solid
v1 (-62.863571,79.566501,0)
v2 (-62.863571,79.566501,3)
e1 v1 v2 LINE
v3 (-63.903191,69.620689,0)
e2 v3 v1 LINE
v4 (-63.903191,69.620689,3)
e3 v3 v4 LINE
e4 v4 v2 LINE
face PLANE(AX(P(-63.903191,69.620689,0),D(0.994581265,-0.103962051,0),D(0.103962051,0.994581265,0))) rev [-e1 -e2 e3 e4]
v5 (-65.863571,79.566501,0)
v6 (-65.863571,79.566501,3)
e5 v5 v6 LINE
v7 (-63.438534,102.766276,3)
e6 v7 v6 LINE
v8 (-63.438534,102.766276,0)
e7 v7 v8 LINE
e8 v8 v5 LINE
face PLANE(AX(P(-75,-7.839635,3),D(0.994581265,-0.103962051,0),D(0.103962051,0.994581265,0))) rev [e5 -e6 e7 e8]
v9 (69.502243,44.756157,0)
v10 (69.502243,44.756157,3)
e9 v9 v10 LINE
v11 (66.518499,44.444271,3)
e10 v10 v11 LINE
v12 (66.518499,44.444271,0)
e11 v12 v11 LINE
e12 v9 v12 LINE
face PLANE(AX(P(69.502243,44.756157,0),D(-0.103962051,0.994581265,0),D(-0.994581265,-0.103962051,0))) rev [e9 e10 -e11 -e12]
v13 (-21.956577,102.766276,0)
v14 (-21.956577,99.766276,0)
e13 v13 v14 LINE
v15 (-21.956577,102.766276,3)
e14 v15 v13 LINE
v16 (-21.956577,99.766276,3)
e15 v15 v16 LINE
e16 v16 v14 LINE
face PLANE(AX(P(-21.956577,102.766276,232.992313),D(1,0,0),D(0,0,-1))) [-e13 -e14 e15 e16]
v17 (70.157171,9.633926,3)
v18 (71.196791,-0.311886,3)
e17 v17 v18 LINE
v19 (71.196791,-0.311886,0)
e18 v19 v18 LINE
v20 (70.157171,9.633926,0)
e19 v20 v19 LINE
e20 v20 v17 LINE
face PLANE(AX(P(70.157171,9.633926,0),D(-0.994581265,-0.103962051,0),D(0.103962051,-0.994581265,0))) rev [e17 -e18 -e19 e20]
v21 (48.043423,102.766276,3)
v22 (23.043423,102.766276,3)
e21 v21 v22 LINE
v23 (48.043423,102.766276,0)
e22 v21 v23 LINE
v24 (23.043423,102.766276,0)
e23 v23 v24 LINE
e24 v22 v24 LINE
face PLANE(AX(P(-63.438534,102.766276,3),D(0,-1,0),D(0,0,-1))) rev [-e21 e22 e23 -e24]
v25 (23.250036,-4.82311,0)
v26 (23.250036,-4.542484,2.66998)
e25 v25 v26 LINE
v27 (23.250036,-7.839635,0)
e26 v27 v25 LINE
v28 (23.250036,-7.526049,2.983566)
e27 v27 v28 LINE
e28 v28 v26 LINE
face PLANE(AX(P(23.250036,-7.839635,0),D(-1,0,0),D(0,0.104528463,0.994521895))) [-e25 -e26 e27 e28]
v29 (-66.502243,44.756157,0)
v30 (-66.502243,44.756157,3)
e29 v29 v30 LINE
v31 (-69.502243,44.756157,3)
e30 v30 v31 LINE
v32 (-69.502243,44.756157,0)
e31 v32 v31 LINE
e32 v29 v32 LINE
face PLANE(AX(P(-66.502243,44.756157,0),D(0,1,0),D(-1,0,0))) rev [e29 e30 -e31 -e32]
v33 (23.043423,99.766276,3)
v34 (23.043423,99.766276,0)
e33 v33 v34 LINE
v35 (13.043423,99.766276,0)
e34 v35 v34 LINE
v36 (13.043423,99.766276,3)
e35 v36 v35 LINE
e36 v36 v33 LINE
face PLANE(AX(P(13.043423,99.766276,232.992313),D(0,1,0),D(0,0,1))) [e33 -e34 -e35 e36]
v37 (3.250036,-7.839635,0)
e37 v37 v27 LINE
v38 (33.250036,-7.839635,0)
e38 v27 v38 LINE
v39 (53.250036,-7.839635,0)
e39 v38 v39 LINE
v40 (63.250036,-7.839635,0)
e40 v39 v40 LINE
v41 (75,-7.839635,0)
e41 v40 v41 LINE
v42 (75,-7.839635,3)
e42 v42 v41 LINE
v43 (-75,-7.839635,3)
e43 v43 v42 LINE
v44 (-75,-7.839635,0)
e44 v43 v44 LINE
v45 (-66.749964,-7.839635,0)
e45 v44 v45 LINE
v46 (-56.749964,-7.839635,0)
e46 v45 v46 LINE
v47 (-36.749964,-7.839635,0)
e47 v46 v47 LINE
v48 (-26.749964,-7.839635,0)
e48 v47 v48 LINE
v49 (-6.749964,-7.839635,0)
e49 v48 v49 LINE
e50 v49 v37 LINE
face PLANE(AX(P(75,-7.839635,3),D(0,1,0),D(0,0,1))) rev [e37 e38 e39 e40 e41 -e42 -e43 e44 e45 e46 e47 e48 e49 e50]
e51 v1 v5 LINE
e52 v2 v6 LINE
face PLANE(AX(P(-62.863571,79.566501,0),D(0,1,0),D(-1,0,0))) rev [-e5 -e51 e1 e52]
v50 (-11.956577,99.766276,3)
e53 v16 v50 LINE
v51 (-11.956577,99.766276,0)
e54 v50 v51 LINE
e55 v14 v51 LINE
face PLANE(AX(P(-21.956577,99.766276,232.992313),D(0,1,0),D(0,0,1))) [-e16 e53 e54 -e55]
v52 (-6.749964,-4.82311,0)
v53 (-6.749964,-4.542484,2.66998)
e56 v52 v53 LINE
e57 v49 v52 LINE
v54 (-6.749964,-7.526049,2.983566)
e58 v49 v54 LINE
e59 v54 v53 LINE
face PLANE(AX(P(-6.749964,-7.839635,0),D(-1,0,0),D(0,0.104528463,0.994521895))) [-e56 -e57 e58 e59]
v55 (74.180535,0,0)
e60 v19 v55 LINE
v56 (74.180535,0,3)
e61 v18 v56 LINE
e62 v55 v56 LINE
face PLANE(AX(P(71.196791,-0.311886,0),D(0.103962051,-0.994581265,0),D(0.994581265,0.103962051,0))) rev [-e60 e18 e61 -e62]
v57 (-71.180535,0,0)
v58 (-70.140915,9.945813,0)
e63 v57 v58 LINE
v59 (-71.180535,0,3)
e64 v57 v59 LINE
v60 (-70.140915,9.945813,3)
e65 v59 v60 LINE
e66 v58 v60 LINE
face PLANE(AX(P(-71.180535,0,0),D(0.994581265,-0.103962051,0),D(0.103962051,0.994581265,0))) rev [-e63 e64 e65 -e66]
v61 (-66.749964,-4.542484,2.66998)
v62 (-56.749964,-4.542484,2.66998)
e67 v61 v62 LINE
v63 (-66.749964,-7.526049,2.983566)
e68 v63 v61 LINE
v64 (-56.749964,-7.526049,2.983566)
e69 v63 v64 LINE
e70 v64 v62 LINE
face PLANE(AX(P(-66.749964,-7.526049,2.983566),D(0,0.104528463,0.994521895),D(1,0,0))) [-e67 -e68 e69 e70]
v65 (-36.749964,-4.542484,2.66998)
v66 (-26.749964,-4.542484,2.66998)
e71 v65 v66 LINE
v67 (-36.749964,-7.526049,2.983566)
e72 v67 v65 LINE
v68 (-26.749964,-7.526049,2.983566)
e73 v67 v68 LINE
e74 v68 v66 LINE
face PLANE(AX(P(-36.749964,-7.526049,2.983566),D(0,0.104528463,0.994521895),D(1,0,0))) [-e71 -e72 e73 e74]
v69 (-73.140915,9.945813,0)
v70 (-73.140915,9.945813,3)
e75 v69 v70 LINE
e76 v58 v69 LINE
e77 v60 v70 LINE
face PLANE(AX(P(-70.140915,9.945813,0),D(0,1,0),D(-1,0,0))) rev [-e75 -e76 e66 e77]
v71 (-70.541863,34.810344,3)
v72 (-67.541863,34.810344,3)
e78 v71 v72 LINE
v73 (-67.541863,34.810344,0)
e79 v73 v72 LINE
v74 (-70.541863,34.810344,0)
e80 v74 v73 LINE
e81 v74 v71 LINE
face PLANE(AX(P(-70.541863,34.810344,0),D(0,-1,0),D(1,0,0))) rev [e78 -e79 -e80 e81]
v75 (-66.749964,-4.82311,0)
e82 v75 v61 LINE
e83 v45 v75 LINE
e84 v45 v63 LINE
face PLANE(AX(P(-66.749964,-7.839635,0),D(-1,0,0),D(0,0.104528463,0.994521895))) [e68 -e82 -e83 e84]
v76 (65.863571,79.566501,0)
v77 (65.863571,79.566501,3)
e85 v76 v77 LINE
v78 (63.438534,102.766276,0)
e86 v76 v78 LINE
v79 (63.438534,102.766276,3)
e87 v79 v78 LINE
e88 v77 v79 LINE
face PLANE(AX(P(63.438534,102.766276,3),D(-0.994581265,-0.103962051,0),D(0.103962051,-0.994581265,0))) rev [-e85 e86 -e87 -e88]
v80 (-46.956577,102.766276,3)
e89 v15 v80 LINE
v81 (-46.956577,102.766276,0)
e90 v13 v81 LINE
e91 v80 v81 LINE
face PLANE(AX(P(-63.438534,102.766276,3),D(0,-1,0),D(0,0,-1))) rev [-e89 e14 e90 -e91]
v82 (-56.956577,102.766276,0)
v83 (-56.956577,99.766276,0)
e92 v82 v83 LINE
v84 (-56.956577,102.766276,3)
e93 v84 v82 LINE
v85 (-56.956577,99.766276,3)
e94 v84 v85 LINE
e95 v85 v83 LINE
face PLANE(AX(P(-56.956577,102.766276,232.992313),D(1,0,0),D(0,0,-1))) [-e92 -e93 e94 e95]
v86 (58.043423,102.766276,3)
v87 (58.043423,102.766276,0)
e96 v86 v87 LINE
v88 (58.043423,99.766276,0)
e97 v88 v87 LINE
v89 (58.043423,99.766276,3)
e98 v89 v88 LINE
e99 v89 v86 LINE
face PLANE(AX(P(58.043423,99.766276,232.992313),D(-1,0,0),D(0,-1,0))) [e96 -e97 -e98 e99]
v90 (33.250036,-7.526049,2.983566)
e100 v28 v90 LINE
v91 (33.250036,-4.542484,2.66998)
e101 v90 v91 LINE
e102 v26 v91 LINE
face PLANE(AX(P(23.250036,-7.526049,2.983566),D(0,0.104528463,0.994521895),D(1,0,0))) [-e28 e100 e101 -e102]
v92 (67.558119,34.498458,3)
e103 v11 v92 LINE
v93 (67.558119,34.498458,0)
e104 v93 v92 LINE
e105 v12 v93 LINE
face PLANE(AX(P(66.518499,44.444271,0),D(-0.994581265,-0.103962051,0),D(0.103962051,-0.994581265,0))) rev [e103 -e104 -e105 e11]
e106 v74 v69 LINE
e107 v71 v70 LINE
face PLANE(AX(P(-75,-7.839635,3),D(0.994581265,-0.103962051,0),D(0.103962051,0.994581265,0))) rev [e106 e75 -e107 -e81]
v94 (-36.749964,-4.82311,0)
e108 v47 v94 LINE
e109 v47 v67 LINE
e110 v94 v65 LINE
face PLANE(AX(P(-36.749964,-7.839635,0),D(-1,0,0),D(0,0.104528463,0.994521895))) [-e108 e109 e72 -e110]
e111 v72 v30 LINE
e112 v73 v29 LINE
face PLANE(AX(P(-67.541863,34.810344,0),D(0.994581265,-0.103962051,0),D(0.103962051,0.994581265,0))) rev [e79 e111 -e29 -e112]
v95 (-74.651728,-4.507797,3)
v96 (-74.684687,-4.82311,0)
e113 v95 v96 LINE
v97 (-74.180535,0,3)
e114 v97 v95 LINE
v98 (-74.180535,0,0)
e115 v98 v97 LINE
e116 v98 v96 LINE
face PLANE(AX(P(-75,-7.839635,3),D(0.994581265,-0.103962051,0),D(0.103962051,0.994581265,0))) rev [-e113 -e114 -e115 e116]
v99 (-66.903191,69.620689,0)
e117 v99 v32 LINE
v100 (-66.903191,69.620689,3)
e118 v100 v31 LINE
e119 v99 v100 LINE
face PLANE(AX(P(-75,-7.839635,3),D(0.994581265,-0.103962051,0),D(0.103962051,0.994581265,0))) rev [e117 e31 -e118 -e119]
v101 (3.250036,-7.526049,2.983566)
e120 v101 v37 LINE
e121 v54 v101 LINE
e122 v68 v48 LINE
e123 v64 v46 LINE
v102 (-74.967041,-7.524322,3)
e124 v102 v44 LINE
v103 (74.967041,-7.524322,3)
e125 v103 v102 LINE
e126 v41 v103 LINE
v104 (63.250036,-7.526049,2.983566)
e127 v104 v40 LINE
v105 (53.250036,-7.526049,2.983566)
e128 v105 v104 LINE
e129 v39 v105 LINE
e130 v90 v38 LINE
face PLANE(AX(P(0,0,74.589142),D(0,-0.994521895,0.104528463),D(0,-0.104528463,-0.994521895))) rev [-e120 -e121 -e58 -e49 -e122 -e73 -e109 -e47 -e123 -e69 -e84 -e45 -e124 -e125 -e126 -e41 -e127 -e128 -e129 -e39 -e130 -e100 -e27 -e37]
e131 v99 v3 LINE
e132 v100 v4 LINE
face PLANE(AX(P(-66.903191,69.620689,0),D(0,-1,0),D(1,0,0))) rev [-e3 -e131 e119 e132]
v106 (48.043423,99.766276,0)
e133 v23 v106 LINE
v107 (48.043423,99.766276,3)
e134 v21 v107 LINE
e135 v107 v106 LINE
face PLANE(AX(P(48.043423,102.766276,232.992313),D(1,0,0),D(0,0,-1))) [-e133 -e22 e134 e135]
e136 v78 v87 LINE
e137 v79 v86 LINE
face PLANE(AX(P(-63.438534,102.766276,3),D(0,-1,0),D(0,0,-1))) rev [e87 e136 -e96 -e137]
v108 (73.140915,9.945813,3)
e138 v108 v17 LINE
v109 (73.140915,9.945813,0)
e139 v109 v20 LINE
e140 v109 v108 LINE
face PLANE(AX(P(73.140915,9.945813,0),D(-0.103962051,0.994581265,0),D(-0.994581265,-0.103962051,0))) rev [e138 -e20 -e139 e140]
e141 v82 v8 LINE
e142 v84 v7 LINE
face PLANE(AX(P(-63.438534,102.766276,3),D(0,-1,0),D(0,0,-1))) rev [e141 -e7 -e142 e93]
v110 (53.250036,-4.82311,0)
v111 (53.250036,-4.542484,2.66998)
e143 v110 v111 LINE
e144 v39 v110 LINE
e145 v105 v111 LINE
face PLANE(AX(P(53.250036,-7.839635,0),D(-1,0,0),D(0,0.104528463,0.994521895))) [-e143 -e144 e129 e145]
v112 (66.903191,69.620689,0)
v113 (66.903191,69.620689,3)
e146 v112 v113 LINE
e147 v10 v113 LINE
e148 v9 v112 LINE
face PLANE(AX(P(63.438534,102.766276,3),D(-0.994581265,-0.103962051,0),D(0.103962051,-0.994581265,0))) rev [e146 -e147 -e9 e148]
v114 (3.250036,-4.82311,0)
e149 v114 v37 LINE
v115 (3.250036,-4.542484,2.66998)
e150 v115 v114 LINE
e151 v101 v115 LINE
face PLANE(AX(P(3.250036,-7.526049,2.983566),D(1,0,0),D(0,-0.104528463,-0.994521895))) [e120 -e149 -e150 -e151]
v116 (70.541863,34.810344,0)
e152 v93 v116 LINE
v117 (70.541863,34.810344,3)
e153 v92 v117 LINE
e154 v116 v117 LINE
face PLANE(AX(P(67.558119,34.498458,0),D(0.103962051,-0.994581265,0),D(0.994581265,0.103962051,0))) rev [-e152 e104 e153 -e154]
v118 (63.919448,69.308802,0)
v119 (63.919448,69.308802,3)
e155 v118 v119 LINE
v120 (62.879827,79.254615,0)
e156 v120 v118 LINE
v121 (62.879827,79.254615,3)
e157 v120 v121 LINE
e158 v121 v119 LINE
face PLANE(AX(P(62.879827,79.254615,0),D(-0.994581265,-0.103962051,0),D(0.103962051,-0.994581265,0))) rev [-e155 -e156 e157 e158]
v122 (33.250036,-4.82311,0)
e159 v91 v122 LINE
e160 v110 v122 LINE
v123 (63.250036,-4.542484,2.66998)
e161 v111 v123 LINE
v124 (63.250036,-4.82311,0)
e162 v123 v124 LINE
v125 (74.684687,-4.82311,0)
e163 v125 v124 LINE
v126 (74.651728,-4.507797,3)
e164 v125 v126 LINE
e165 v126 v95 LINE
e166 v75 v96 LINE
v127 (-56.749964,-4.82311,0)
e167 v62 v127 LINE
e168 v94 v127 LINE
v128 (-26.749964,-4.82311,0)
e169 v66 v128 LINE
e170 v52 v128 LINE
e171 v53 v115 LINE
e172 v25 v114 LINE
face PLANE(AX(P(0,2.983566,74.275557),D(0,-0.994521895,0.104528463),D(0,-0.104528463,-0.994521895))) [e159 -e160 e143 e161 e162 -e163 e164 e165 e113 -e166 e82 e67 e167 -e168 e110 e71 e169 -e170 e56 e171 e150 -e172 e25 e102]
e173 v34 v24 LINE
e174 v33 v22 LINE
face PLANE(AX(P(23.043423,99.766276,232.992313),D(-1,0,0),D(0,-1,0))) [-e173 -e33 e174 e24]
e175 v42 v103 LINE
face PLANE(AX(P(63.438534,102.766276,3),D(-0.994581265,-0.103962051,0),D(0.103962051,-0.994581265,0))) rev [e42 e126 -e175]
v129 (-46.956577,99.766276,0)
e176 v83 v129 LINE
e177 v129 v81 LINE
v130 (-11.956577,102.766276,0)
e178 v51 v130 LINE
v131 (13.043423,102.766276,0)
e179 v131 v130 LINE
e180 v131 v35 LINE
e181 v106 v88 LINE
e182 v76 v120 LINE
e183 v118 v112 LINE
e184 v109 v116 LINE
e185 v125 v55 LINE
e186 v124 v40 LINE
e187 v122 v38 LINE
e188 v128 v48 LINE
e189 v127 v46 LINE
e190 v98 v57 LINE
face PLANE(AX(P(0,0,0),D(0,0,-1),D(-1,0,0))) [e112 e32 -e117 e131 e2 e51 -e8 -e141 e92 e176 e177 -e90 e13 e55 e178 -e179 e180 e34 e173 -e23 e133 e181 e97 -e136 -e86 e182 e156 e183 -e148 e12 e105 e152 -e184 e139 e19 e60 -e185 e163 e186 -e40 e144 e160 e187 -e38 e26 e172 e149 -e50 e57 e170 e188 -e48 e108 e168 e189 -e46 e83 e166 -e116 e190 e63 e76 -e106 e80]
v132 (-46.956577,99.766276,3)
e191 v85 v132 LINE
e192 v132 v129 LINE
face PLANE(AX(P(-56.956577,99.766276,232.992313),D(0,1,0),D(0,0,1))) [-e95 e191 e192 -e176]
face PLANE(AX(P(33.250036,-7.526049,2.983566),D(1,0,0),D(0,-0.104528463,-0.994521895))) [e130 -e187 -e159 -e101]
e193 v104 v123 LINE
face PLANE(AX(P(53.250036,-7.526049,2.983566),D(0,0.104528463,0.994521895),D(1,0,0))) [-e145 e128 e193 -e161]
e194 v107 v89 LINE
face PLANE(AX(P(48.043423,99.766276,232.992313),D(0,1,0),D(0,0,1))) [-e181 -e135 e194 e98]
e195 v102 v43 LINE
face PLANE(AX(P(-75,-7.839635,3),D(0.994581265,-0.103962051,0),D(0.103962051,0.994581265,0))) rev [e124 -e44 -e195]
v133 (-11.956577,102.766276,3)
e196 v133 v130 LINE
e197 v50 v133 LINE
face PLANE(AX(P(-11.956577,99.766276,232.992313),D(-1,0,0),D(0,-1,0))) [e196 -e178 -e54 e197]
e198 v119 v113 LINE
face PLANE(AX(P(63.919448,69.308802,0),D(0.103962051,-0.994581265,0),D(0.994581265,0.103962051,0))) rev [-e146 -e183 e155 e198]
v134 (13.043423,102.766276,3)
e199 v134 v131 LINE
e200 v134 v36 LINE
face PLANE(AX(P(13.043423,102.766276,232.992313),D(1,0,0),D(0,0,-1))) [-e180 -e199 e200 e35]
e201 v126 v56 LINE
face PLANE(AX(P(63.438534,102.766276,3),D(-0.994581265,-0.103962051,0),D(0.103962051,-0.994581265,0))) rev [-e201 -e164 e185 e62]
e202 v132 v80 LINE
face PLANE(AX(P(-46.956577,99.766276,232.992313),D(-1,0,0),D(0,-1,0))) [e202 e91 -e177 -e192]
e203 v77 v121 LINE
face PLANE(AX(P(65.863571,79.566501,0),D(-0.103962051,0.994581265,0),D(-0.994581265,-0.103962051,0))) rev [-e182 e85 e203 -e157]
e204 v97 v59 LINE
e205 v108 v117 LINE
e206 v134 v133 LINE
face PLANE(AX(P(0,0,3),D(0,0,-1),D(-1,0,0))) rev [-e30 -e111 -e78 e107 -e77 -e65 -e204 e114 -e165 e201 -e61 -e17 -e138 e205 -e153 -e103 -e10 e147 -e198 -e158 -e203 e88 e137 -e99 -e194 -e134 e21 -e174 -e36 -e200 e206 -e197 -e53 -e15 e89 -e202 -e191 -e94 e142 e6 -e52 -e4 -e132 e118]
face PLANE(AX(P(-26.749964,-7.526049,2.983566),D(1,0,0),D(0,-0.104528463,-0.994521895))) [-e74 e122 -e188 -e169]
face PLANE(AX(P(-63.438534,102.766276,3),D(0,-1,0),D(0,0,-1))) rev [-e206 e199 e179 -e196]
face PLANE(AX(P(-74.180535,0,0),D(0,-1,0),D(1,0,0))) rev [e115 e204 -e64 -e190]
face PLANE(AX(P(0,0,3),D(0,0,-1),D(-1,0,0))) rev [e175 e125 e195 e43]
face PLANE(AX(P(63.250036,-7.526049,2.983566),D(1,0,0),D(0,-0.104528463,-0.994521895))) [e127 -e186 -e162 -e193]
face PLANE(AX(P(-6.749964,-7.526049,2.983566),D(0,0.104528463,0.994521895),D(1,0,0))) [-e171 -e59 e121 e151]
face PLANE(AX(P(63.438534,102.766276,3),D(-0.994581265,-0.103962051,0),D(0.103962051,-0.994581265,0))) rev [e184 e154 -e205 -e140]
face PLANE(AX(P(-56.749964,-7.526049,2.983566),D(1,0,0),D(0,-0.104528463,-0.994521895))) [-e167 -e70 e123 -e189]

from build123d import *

# Parameters (mm, degrees)
BOSS_EXTRUDE1_DEPTH = 3
CUT_EXTRUDE1_DEPTH  = 128.25921375
LPATTERN1_COUNT     = 4
LPATTERN1_PITCH     = 35
CUT_EXTRUDE3_DEPTH  = 3
LPATTERN2_COUNT     = 3
LPATTERN2_PITCH     = 35
CUT_EXTRUDE4_DEPTH  = 3
LPATTERN3_COUNT     = 3
LPATTERN3_PITCH     = 35
CAVITY1_START       = -7.796688406
CAVITY1_DEPTH       = 3


# Read off the part's stored shape, not the designer's step: Cavity1
with BuildPart() as part:
    # Sketch1 → Boss-Extrude1 (new body)
    with BuildSketch(Plane.XY):
        Polygon((-63.438534121, 102.766276007), (63.438534121, 102.766276007), (75, -7.839634745), (-75, -7.839634745), align=None)
    extrude(amount=BOSS_EXTRUDE1_DEPTH)

    # Sketch2 → Cut-Extrude1 (cut, symmetric)
    with BuildSketch(Plane.XY):
        Polygon((-56.956577019, 457.127747207), (-56.956577019, 102.766276007), (-56.956577019, 99.766276007), (-46.956577019, 99.766276007), (-46.956577019, 102.766276007), (-46.956577019, 457.127747207), (-46.956577019, 1165.850689606), (-56.956577019, 1165.850689606), align=None)
    cut_extrude1 = extrude(amount=CUT_EXTRUDE1_DEPTH, both=True, mode=Mode.SUBTRACT)

    # LPattern1: Cut-Extrude1 ×4
    with Locations(*[(i * LPATTERN1_PITCH, 0, 0) for i in range(1, LPATTERN1_COUNT)]):
        add(cut_extrude1, mode=Mode.SUBTRACT)

    # Sketch3 → Cut-Extrude3 (cut)
    with BuildSketch(Plane.XY.offset(3)):
        Polygon((-74.180535028, 0), (-71.180535028, 0), (-70.140914516, 9.945812646), (-73.140914516, 9.945812646), align=None)
    cut_extrude3 = extrude(amount=-CUT_EXTRUDE3_DEPTH, mode=Mode.SUBTRACT)

    # LPattern2: Cut-Extrude3 ×3
    with Locations(*[Vector(0.10396205118449778, 0.9945812646101434, 0) * (i * LPATTERN2_PITCH) for i in range(1, LPATTERN2_COUNT)]):
        add(cut_extrude3, mode=Mode.SUBTRACT)

    # Sketch7 → Cut-Extrude4 (cut)
    with BuildSketch(Plane.XY.offset(3)):
        Polygon((74.180535028, 0), (73.140914516, 9.945812646), (70.157170722, 9.633926493), (71.196791234, -0.311886154), align=None)
    cut_extrude4 = extrude(amount=-CUT_EXTRUDE4_DEPTH, mode=Mode.SUBTRACT)

    # LPattern3: Cut-Extrude4 ×3
    with Locations(*[Vector(-0.10396205118449776, 0.9945812646101434, 0) * (i * LPATTERN3_PITCH) for i in range(1, LPATTERN3_COUNT)]):
        add(cut_extrude4, mode=Mode.SUBTRACT)

    # Cavity1 outline → Cavity1 (cut)
    with BuildSketch(Plane(origin=(0, 0, 0), x_dir=(1, 0, 0), z_dir=(0, 0.9945218953682734, -0.10452846326765304)).offset(CAVITY1_START)):
        Polygon((-56.749963879, 2), (-56.749963879, -2.180535028), (-66.749963879, -2.180535028), (-66.749963879, 2), (-77, 2), (-77, -4), (77, -4), (77, 2), (63.250036121, 2), (63.250036121, -2.180535028), (53.250036121, -2.180535028), (53.250036121, 2), (33.250036121, 2), (33.250036121, -2.180535028), (23.250036121, -2.180535028), (23.250036121, 2), (3.250036121, 2), (3.250036121, -2.180535028), (-6.749963879, -2.180535028), (-6.749963879, 2), (-26.749963879, 2), (-26.749963879, -2.180535028), (-36.749963879, -2.180535028), (-36.749963879, 2), align=None)
    extrude(amount=CAVITY1_DEPTH, mode=Mode.SUBTRACT)


solid = part.part
